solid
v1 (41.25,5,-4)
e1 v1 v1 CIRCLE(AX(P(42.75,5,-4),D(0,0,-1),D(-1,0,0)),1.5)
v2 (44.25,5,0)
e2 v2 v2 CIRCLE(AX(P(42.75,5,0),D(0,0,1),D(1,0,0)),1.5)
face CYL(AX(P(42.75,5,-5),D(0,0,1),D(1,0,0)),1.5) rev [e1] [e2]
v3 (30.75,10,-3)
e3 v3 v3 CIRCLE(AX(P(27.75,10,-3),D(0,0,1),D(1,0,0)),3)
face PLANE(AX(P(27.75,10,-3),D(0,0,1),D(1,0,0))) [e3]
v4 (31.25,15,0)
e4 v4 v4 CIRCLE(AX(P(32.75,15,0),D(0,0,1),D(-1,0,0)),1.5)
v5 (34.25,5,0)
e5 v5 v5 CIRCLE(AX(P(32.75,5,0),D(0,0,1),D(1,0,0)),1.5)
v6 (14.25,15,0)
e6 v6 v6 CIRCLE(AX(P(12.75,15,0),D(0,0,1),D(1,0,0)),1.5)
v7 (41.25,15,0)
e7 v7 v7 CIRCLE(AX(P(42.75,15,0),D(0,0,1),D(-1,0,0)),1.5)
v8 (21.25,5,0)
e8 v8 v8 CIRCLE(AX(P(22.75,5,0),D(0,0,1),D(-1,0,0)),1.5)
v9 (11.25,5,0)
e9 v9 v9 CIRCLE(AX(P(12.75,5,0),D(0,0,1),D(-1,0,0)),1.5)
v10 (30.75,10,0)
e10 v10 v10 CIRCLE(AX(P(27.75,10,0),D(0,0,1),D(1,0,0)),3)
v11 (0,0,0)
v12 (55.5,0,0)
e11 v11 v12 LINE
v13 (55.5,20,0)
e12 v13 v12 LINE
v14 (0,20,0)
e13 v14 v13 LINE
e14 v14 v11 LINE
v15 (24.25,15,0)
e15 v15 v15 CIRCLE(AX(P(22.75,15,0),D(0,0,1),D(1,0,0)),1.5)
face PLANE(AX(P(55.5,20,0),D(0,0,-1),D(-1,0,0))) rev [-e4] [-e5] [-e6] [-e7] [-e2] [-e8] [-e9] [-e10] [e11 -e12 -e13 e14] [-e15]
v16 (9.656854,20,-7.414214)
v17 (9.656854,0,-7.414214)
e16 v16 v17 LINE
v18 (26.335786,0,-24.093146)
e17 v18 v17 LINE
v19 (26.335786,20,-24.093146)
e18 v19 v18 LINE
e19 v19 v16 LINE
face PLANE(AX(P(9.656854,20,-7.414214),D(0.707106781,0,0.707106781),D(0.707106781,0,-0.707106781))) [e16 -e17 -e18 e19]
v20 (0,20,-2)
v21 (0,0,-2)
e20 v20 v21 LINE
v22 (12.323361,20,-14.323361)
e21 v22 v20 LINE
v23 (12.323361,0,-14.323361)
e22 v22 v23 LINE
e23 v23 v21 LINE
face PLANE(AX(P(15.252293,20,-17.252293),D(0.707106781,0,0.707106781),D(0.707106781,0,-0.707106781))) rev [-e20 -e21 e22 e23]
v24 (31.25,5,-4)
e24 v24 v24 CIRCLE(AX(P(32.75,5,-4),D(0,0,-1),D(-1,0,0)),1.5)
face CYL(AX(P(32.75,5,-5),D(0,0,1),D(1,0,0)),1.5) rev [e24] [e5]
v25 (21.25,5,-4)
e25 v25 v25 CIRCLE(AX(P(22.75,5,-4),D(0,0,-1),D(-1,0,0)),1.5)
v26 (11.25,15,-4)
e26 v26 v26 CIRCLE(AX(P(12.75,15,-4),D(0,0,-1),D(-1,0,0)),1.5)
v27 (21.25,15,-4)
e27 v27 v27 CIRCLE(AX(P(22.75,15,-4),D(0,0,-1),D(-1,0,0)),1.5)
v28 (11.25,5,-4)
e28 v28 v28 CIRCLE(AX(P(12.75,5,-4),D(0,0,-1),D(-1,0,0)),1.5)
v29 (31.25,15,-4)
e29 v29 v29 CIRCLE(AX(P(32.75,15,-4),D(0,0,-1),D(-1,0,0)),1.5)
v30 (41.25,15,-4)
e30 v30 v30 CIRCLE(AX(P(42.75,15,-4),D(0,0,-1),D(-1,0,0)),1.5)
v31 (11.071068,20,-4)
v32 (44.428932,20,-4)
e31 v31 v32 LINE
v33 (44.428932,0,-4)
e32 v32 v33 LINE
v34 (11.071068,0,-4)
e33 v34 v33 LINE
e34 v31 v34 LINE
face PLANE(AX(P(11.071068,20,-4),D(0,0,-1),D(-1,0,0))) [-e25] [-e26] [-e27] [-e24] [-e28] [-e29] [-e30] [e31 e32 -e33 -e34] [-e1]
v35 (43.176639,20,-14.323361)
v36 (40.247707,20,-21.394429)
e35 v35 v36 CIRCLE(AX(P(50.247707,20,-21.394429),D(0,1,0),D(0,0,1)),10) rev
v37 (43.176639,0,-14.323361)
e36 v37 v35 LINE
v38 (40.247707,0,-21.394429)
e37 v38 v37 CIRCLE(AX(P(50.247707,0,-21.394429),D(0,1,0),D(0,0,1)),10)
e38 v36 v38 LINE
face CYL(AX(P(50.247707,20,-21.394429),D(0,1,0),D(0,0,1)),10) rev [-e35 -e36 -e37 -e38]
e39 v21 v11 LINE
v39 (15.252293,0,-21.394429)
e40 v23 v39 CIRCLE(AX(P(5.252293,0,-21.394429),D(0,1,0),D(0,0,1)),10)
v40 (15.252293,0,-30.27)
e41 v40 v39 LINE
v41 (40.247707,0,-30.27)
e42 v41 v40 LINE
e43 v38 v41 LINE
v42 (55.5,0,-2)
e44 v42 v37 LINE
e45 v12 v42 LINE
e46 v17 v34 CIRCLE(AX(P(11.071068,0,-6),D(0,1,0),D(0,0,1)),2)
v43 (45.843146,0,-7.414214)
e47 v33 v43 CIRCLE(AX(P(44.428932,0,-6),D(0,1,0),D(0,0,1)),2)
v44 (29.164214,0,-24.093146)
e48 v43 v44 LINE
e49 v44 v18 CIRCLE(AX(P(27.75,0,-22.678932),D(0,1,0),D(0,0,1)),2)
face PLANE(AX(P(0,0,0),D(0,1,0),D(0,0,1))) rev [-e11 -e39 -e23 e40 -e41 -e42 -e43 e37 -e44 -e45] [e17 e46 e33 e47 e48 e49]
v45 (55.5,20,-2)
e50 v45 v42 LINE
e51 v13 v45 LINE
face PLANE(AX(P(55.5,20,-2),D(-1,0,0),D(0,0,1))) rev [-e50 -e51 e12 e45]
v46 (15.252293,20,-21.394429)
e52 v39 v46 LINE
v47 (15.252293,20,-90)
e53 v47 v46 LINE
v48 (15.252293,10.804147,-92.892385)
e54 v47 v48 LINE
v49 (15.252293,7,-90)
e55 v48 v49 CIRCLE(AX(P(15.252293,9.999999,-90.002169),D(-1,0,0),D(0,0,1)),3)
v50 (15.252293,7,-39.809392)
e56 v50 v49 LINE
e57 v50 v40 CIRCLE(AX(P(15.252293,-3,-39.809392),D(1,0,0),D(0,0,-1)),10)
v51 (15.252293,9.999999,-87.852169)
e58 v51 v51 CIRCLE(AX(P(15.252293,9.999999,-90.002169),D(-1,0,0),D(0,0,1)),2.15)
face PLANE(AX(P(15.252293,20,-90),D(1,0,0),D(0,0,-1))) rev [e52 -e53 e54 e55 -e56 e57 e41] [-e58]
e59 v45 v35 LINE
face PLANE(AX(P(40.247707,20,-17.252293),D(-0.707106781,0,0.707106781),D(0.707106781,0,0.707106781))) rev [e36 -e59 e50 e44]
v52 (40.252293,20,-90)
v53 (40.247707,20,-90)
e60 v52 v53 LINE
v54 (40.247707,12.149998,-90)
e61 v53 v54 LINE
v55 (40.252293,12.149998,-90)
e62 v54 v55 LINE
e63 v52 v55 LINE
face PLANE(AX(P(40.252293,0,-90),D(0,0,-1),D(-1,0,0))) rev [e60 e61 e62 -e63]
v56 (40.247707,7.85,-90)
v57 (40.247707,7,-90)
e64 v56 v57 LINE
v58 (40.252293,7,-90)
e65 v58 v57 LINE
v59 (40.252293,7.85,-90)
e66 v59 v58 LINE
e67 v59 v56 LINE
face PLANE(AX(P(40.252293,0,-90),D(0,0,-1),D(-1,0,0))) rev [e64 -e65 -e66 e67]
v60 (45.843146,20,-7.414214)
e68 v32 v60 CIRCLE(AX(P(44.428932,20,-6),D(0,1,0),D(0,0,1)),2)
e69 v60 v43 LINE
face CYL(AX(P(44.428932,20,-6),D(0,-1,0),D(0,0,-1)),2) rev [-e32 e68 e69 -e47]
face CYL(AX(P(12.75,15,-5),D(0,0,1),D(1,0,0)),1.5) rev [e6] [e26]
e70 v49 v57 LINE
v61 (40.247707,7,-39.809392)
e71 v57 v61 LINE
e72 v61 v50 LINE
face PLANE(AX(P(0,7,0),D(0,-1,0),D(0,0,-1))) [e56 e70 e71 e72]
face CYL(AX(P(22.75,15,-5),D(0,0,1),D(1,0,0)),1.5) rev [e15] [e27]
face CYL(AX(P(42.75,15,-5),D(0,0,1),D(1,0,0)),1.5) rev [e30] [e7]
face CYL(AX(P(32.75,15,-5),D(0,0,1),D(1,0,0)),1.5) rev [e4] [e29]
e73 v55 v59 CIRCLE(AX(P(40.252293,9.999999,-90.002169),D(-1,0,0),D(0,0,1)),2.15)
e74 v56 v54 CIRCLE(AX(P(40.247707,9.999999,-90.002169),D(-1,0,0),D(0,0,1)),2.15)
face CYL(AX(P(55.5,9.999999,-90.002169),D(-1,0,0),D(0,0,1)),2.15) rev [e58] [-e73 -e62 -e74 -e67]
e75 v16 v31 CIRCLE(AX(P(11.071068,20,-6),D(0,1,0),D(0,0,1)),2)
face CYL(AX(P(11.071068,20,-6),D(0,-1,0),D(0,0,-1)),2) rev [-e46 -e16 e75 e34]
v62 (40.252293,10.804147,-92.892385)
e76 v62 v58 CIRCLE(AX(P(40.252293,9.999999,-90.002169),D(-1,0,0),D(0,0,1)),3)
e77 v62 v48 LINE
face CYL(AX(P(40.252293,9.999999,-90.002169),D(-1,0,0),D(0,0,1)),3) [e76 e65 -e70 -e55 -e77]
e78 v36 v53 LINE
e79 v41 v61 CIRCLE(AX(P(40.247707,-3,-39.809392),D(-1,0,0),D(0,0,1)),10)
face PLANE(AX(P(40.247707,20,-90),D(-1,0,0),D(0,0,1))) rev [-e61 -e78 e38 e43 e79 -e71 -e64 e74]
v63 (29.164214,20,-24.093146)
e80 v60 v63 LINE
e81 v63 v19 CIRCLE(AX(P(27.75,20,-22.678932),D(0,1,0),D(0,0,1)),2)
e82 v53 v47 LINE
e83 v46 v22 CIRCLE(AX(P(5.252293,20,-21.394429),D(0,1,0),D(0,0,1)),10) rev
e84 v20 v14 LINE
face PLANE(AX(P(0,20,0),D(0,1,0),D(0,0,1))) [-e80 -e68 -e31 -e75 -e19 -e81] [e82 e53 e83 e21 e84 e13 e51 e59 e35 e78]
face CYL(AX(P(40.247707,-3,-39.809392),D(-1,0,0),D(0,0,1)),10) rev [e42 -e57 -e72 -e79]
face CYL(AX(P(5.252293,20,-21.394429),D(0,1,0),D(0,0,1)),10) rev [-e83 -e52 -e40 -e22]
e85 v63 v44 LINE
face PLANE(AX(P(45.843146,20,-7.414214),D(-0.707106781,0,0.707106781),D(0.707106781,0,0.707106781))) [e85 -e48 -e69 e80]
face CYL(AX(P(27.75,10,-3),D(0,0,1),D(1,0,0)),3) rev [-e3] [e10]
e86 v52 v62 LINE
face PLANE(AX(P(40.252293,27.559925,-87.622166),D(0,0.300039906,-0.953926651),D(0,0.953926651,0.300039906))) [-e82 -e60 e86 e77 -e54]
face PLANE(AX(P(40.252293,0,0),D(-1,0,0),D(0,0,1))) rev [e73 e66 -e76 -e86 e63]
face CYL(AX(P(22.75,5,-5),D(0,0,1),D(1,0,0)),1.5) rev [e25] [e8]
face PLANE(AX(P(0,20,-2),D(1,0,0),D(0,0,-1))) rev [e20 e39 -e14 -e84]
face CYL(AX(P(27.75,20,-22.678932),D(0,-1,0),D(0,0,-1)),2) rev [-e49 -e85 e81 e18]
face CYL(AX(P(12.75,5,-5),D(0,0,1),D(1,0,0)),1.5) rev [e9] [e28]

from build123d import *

# Parameters (mm, degrees)
EXTRUDE_1_DEPTH     = 20
SKETCH_2_R          = 1.5
CUT_EXTRUDE_1_DEPTH = 5
SKETCH_3_R          = 3
CUT_EXTRUDE_2_DEPTH = 3
SKETCH_4_W          = 24.99770673
SKETCH_4_H          = 59.73
CUT_EXTRUDE_3_DEPTH = 7
EXTRUDE_2_DEPTH     = 25
SKETCH_6_R          = 2.15
CUT_EXTRUDE_4_DEPTH = 104.292213424
FILLET_4_R          = 10
FILLET_5_R          = 10


with BuildPart() as part:
    # 스케치1 → 보스-돌출1 (new body)
    with BuildSketch(Plane(origin=(0, 0, 0), x_dir=(1, 0, 0), z_dir=(0, 1, 0))):
        Polygon((40.24770673, 90), (15.25229327, 90), (15.25229327, 17.25229327), (0, 2), (0, 0), (55.5, 0), (55.5, 2), (40.24770673, 17.25229327), align=None)
        with BuildLine():
            Line((11.071067812, 4), (44.428932188, 4))
            ThreePointArc((44.428932188, 4), (46.276691253, 5.234633135), (45.843145751, 7.414213562))
            Line((45.843145751, 7.414213562), (29.164213562, 24.093145751))
            ThreePointArc((29.164213562, 24.093145751), (27.75, 24.678932188), (26.335786438, 24.093145751))
            Line((26.335786438, 24.093145751), (9.656854249, 7.414213562))
            ThreePointArc((9.656854249, 7.414213562), (9.223308747, 5.234633135), (11.071067812, 4))
        make_face(mode=Mode.SUBTRACT)
    extrude(amount=EXTRUDE_1_DEPTH)

    # 스케치2 → 컷-돌출1 (cut)
    with BuildSketch(Plane.XY):
        with Locations((12.75, 15)):
            Circle(SKETCH_2_R)
        with Locations((22.75, 15)):
            Circle(SKETCH_2_R)
        with Locations(Location((32.75, 15, 0), (0, 0, 180))):
            Circle(SKETCH_2_R)
        with Locations(Location((42.75, 15, 0), (0, 0, 180))):
            Circle(SKETCH_2_R)
        with Locations((42.75, 5)):
            Circle(SKETCH_2_R)
        with Locations((32.75, 5)):
            Circle(SKETCH_2_R)
        with Locations(Location((22.75, 5, 0), (0, 0, 180))):
            Circle(SKETCH_2_R)
        with Locations(Location((12.75, 5, 0), (0, 0, 180))):
            Circle(SKETCH_2_R)
    extrude(amount=-CUT_EXTRUDE_1_DEPTH, mode=Mode.SUBTRACT)

    # 스케치3 → 컷-돌출2 (cut)
    with BuildSketch(Plane.XY):
        with Locations((27.75, 10)):
            Circle(SKETCH_3_R)
    extrude(amount=-CUT_EXTRUDE_2_DEPTH, mode=Mode.SUBTRACT)

    # 스케치4 → 컷-돌출3 (cut)
    with BuildSketch(Plane.XZ):
        with Locations((27.748853365, -60.135)):
            Rectangle(SKETCH_4_W, SKETCH_4_H)
    extrude(amount=-CUT_EXTRUDE_3_DEPTH, mode=Mode.SUBTRACT)

    # 스케치5 → 보스-돌출2 (add)
    with BuildSketch(Plane.ZY.offset(-15.25229327)):
        with BuildLine():
            Line((-90, 20), (-92.892384696, 10.804147089))
            ThreePointArc((-92.892384696, 10.804147089), (-92.390282771, 8.184258847), (-90, 7))
            Line((-90, 7), (-90, 20))
        make_face()
    extrude(amount=-EXTRUDE_2_DEPTH)

    # 스케치6 → 컷-돌출4 (cut, through all)
    with BuildSketch(Plane.ZY.offset(-15.25229327)):
        with Locations((-90.002169099, 9.999999216)):
            Circle(SKETCH_6_R)
    extrude(amount=-CUT_EXTRUDE_4_DEPTH, mode=Mode.SUBTRACT)

    # 필렛4
    fillet_4_edges = [part.edges().sort_by_distance(p)[0] for p in [
        (15.25229327, 10, -17.25229327),
        (40.24770673, 10, -17.25229327),
    ]]
    fillet(fillet_4_edges, radius=FILLET_4_R)

    # 필렛5
    # the kernel refuses this fillet: 10 mm, written as the material it adds along each edge
    with BuildSketch(Plane(origin=(15.25229327, 7, -30.27), x_dir=(0, -1, 0), z_dir=(1, 0, 0))) as fillet_5_piece_1:
        with BuildLine():
            CenterArc((10, 9.539392014), FILLET_5_R, 180, 72.542396876)
            Line((0, 9.539392014), (-0.2, 9.539392014))
            Line((-0.2, 9.539392014), (-0.2, 0))
            Line((-0.2, 0), (0, -0.2))
            ThreePointArc((0, -0.2), (3.5, -0.2), (6.94, -0.19078784))
            Line((6.94, -0.19078784), (7, 0))
        make_face()
    extrude(amount=24.99541346)


solid = part.part
